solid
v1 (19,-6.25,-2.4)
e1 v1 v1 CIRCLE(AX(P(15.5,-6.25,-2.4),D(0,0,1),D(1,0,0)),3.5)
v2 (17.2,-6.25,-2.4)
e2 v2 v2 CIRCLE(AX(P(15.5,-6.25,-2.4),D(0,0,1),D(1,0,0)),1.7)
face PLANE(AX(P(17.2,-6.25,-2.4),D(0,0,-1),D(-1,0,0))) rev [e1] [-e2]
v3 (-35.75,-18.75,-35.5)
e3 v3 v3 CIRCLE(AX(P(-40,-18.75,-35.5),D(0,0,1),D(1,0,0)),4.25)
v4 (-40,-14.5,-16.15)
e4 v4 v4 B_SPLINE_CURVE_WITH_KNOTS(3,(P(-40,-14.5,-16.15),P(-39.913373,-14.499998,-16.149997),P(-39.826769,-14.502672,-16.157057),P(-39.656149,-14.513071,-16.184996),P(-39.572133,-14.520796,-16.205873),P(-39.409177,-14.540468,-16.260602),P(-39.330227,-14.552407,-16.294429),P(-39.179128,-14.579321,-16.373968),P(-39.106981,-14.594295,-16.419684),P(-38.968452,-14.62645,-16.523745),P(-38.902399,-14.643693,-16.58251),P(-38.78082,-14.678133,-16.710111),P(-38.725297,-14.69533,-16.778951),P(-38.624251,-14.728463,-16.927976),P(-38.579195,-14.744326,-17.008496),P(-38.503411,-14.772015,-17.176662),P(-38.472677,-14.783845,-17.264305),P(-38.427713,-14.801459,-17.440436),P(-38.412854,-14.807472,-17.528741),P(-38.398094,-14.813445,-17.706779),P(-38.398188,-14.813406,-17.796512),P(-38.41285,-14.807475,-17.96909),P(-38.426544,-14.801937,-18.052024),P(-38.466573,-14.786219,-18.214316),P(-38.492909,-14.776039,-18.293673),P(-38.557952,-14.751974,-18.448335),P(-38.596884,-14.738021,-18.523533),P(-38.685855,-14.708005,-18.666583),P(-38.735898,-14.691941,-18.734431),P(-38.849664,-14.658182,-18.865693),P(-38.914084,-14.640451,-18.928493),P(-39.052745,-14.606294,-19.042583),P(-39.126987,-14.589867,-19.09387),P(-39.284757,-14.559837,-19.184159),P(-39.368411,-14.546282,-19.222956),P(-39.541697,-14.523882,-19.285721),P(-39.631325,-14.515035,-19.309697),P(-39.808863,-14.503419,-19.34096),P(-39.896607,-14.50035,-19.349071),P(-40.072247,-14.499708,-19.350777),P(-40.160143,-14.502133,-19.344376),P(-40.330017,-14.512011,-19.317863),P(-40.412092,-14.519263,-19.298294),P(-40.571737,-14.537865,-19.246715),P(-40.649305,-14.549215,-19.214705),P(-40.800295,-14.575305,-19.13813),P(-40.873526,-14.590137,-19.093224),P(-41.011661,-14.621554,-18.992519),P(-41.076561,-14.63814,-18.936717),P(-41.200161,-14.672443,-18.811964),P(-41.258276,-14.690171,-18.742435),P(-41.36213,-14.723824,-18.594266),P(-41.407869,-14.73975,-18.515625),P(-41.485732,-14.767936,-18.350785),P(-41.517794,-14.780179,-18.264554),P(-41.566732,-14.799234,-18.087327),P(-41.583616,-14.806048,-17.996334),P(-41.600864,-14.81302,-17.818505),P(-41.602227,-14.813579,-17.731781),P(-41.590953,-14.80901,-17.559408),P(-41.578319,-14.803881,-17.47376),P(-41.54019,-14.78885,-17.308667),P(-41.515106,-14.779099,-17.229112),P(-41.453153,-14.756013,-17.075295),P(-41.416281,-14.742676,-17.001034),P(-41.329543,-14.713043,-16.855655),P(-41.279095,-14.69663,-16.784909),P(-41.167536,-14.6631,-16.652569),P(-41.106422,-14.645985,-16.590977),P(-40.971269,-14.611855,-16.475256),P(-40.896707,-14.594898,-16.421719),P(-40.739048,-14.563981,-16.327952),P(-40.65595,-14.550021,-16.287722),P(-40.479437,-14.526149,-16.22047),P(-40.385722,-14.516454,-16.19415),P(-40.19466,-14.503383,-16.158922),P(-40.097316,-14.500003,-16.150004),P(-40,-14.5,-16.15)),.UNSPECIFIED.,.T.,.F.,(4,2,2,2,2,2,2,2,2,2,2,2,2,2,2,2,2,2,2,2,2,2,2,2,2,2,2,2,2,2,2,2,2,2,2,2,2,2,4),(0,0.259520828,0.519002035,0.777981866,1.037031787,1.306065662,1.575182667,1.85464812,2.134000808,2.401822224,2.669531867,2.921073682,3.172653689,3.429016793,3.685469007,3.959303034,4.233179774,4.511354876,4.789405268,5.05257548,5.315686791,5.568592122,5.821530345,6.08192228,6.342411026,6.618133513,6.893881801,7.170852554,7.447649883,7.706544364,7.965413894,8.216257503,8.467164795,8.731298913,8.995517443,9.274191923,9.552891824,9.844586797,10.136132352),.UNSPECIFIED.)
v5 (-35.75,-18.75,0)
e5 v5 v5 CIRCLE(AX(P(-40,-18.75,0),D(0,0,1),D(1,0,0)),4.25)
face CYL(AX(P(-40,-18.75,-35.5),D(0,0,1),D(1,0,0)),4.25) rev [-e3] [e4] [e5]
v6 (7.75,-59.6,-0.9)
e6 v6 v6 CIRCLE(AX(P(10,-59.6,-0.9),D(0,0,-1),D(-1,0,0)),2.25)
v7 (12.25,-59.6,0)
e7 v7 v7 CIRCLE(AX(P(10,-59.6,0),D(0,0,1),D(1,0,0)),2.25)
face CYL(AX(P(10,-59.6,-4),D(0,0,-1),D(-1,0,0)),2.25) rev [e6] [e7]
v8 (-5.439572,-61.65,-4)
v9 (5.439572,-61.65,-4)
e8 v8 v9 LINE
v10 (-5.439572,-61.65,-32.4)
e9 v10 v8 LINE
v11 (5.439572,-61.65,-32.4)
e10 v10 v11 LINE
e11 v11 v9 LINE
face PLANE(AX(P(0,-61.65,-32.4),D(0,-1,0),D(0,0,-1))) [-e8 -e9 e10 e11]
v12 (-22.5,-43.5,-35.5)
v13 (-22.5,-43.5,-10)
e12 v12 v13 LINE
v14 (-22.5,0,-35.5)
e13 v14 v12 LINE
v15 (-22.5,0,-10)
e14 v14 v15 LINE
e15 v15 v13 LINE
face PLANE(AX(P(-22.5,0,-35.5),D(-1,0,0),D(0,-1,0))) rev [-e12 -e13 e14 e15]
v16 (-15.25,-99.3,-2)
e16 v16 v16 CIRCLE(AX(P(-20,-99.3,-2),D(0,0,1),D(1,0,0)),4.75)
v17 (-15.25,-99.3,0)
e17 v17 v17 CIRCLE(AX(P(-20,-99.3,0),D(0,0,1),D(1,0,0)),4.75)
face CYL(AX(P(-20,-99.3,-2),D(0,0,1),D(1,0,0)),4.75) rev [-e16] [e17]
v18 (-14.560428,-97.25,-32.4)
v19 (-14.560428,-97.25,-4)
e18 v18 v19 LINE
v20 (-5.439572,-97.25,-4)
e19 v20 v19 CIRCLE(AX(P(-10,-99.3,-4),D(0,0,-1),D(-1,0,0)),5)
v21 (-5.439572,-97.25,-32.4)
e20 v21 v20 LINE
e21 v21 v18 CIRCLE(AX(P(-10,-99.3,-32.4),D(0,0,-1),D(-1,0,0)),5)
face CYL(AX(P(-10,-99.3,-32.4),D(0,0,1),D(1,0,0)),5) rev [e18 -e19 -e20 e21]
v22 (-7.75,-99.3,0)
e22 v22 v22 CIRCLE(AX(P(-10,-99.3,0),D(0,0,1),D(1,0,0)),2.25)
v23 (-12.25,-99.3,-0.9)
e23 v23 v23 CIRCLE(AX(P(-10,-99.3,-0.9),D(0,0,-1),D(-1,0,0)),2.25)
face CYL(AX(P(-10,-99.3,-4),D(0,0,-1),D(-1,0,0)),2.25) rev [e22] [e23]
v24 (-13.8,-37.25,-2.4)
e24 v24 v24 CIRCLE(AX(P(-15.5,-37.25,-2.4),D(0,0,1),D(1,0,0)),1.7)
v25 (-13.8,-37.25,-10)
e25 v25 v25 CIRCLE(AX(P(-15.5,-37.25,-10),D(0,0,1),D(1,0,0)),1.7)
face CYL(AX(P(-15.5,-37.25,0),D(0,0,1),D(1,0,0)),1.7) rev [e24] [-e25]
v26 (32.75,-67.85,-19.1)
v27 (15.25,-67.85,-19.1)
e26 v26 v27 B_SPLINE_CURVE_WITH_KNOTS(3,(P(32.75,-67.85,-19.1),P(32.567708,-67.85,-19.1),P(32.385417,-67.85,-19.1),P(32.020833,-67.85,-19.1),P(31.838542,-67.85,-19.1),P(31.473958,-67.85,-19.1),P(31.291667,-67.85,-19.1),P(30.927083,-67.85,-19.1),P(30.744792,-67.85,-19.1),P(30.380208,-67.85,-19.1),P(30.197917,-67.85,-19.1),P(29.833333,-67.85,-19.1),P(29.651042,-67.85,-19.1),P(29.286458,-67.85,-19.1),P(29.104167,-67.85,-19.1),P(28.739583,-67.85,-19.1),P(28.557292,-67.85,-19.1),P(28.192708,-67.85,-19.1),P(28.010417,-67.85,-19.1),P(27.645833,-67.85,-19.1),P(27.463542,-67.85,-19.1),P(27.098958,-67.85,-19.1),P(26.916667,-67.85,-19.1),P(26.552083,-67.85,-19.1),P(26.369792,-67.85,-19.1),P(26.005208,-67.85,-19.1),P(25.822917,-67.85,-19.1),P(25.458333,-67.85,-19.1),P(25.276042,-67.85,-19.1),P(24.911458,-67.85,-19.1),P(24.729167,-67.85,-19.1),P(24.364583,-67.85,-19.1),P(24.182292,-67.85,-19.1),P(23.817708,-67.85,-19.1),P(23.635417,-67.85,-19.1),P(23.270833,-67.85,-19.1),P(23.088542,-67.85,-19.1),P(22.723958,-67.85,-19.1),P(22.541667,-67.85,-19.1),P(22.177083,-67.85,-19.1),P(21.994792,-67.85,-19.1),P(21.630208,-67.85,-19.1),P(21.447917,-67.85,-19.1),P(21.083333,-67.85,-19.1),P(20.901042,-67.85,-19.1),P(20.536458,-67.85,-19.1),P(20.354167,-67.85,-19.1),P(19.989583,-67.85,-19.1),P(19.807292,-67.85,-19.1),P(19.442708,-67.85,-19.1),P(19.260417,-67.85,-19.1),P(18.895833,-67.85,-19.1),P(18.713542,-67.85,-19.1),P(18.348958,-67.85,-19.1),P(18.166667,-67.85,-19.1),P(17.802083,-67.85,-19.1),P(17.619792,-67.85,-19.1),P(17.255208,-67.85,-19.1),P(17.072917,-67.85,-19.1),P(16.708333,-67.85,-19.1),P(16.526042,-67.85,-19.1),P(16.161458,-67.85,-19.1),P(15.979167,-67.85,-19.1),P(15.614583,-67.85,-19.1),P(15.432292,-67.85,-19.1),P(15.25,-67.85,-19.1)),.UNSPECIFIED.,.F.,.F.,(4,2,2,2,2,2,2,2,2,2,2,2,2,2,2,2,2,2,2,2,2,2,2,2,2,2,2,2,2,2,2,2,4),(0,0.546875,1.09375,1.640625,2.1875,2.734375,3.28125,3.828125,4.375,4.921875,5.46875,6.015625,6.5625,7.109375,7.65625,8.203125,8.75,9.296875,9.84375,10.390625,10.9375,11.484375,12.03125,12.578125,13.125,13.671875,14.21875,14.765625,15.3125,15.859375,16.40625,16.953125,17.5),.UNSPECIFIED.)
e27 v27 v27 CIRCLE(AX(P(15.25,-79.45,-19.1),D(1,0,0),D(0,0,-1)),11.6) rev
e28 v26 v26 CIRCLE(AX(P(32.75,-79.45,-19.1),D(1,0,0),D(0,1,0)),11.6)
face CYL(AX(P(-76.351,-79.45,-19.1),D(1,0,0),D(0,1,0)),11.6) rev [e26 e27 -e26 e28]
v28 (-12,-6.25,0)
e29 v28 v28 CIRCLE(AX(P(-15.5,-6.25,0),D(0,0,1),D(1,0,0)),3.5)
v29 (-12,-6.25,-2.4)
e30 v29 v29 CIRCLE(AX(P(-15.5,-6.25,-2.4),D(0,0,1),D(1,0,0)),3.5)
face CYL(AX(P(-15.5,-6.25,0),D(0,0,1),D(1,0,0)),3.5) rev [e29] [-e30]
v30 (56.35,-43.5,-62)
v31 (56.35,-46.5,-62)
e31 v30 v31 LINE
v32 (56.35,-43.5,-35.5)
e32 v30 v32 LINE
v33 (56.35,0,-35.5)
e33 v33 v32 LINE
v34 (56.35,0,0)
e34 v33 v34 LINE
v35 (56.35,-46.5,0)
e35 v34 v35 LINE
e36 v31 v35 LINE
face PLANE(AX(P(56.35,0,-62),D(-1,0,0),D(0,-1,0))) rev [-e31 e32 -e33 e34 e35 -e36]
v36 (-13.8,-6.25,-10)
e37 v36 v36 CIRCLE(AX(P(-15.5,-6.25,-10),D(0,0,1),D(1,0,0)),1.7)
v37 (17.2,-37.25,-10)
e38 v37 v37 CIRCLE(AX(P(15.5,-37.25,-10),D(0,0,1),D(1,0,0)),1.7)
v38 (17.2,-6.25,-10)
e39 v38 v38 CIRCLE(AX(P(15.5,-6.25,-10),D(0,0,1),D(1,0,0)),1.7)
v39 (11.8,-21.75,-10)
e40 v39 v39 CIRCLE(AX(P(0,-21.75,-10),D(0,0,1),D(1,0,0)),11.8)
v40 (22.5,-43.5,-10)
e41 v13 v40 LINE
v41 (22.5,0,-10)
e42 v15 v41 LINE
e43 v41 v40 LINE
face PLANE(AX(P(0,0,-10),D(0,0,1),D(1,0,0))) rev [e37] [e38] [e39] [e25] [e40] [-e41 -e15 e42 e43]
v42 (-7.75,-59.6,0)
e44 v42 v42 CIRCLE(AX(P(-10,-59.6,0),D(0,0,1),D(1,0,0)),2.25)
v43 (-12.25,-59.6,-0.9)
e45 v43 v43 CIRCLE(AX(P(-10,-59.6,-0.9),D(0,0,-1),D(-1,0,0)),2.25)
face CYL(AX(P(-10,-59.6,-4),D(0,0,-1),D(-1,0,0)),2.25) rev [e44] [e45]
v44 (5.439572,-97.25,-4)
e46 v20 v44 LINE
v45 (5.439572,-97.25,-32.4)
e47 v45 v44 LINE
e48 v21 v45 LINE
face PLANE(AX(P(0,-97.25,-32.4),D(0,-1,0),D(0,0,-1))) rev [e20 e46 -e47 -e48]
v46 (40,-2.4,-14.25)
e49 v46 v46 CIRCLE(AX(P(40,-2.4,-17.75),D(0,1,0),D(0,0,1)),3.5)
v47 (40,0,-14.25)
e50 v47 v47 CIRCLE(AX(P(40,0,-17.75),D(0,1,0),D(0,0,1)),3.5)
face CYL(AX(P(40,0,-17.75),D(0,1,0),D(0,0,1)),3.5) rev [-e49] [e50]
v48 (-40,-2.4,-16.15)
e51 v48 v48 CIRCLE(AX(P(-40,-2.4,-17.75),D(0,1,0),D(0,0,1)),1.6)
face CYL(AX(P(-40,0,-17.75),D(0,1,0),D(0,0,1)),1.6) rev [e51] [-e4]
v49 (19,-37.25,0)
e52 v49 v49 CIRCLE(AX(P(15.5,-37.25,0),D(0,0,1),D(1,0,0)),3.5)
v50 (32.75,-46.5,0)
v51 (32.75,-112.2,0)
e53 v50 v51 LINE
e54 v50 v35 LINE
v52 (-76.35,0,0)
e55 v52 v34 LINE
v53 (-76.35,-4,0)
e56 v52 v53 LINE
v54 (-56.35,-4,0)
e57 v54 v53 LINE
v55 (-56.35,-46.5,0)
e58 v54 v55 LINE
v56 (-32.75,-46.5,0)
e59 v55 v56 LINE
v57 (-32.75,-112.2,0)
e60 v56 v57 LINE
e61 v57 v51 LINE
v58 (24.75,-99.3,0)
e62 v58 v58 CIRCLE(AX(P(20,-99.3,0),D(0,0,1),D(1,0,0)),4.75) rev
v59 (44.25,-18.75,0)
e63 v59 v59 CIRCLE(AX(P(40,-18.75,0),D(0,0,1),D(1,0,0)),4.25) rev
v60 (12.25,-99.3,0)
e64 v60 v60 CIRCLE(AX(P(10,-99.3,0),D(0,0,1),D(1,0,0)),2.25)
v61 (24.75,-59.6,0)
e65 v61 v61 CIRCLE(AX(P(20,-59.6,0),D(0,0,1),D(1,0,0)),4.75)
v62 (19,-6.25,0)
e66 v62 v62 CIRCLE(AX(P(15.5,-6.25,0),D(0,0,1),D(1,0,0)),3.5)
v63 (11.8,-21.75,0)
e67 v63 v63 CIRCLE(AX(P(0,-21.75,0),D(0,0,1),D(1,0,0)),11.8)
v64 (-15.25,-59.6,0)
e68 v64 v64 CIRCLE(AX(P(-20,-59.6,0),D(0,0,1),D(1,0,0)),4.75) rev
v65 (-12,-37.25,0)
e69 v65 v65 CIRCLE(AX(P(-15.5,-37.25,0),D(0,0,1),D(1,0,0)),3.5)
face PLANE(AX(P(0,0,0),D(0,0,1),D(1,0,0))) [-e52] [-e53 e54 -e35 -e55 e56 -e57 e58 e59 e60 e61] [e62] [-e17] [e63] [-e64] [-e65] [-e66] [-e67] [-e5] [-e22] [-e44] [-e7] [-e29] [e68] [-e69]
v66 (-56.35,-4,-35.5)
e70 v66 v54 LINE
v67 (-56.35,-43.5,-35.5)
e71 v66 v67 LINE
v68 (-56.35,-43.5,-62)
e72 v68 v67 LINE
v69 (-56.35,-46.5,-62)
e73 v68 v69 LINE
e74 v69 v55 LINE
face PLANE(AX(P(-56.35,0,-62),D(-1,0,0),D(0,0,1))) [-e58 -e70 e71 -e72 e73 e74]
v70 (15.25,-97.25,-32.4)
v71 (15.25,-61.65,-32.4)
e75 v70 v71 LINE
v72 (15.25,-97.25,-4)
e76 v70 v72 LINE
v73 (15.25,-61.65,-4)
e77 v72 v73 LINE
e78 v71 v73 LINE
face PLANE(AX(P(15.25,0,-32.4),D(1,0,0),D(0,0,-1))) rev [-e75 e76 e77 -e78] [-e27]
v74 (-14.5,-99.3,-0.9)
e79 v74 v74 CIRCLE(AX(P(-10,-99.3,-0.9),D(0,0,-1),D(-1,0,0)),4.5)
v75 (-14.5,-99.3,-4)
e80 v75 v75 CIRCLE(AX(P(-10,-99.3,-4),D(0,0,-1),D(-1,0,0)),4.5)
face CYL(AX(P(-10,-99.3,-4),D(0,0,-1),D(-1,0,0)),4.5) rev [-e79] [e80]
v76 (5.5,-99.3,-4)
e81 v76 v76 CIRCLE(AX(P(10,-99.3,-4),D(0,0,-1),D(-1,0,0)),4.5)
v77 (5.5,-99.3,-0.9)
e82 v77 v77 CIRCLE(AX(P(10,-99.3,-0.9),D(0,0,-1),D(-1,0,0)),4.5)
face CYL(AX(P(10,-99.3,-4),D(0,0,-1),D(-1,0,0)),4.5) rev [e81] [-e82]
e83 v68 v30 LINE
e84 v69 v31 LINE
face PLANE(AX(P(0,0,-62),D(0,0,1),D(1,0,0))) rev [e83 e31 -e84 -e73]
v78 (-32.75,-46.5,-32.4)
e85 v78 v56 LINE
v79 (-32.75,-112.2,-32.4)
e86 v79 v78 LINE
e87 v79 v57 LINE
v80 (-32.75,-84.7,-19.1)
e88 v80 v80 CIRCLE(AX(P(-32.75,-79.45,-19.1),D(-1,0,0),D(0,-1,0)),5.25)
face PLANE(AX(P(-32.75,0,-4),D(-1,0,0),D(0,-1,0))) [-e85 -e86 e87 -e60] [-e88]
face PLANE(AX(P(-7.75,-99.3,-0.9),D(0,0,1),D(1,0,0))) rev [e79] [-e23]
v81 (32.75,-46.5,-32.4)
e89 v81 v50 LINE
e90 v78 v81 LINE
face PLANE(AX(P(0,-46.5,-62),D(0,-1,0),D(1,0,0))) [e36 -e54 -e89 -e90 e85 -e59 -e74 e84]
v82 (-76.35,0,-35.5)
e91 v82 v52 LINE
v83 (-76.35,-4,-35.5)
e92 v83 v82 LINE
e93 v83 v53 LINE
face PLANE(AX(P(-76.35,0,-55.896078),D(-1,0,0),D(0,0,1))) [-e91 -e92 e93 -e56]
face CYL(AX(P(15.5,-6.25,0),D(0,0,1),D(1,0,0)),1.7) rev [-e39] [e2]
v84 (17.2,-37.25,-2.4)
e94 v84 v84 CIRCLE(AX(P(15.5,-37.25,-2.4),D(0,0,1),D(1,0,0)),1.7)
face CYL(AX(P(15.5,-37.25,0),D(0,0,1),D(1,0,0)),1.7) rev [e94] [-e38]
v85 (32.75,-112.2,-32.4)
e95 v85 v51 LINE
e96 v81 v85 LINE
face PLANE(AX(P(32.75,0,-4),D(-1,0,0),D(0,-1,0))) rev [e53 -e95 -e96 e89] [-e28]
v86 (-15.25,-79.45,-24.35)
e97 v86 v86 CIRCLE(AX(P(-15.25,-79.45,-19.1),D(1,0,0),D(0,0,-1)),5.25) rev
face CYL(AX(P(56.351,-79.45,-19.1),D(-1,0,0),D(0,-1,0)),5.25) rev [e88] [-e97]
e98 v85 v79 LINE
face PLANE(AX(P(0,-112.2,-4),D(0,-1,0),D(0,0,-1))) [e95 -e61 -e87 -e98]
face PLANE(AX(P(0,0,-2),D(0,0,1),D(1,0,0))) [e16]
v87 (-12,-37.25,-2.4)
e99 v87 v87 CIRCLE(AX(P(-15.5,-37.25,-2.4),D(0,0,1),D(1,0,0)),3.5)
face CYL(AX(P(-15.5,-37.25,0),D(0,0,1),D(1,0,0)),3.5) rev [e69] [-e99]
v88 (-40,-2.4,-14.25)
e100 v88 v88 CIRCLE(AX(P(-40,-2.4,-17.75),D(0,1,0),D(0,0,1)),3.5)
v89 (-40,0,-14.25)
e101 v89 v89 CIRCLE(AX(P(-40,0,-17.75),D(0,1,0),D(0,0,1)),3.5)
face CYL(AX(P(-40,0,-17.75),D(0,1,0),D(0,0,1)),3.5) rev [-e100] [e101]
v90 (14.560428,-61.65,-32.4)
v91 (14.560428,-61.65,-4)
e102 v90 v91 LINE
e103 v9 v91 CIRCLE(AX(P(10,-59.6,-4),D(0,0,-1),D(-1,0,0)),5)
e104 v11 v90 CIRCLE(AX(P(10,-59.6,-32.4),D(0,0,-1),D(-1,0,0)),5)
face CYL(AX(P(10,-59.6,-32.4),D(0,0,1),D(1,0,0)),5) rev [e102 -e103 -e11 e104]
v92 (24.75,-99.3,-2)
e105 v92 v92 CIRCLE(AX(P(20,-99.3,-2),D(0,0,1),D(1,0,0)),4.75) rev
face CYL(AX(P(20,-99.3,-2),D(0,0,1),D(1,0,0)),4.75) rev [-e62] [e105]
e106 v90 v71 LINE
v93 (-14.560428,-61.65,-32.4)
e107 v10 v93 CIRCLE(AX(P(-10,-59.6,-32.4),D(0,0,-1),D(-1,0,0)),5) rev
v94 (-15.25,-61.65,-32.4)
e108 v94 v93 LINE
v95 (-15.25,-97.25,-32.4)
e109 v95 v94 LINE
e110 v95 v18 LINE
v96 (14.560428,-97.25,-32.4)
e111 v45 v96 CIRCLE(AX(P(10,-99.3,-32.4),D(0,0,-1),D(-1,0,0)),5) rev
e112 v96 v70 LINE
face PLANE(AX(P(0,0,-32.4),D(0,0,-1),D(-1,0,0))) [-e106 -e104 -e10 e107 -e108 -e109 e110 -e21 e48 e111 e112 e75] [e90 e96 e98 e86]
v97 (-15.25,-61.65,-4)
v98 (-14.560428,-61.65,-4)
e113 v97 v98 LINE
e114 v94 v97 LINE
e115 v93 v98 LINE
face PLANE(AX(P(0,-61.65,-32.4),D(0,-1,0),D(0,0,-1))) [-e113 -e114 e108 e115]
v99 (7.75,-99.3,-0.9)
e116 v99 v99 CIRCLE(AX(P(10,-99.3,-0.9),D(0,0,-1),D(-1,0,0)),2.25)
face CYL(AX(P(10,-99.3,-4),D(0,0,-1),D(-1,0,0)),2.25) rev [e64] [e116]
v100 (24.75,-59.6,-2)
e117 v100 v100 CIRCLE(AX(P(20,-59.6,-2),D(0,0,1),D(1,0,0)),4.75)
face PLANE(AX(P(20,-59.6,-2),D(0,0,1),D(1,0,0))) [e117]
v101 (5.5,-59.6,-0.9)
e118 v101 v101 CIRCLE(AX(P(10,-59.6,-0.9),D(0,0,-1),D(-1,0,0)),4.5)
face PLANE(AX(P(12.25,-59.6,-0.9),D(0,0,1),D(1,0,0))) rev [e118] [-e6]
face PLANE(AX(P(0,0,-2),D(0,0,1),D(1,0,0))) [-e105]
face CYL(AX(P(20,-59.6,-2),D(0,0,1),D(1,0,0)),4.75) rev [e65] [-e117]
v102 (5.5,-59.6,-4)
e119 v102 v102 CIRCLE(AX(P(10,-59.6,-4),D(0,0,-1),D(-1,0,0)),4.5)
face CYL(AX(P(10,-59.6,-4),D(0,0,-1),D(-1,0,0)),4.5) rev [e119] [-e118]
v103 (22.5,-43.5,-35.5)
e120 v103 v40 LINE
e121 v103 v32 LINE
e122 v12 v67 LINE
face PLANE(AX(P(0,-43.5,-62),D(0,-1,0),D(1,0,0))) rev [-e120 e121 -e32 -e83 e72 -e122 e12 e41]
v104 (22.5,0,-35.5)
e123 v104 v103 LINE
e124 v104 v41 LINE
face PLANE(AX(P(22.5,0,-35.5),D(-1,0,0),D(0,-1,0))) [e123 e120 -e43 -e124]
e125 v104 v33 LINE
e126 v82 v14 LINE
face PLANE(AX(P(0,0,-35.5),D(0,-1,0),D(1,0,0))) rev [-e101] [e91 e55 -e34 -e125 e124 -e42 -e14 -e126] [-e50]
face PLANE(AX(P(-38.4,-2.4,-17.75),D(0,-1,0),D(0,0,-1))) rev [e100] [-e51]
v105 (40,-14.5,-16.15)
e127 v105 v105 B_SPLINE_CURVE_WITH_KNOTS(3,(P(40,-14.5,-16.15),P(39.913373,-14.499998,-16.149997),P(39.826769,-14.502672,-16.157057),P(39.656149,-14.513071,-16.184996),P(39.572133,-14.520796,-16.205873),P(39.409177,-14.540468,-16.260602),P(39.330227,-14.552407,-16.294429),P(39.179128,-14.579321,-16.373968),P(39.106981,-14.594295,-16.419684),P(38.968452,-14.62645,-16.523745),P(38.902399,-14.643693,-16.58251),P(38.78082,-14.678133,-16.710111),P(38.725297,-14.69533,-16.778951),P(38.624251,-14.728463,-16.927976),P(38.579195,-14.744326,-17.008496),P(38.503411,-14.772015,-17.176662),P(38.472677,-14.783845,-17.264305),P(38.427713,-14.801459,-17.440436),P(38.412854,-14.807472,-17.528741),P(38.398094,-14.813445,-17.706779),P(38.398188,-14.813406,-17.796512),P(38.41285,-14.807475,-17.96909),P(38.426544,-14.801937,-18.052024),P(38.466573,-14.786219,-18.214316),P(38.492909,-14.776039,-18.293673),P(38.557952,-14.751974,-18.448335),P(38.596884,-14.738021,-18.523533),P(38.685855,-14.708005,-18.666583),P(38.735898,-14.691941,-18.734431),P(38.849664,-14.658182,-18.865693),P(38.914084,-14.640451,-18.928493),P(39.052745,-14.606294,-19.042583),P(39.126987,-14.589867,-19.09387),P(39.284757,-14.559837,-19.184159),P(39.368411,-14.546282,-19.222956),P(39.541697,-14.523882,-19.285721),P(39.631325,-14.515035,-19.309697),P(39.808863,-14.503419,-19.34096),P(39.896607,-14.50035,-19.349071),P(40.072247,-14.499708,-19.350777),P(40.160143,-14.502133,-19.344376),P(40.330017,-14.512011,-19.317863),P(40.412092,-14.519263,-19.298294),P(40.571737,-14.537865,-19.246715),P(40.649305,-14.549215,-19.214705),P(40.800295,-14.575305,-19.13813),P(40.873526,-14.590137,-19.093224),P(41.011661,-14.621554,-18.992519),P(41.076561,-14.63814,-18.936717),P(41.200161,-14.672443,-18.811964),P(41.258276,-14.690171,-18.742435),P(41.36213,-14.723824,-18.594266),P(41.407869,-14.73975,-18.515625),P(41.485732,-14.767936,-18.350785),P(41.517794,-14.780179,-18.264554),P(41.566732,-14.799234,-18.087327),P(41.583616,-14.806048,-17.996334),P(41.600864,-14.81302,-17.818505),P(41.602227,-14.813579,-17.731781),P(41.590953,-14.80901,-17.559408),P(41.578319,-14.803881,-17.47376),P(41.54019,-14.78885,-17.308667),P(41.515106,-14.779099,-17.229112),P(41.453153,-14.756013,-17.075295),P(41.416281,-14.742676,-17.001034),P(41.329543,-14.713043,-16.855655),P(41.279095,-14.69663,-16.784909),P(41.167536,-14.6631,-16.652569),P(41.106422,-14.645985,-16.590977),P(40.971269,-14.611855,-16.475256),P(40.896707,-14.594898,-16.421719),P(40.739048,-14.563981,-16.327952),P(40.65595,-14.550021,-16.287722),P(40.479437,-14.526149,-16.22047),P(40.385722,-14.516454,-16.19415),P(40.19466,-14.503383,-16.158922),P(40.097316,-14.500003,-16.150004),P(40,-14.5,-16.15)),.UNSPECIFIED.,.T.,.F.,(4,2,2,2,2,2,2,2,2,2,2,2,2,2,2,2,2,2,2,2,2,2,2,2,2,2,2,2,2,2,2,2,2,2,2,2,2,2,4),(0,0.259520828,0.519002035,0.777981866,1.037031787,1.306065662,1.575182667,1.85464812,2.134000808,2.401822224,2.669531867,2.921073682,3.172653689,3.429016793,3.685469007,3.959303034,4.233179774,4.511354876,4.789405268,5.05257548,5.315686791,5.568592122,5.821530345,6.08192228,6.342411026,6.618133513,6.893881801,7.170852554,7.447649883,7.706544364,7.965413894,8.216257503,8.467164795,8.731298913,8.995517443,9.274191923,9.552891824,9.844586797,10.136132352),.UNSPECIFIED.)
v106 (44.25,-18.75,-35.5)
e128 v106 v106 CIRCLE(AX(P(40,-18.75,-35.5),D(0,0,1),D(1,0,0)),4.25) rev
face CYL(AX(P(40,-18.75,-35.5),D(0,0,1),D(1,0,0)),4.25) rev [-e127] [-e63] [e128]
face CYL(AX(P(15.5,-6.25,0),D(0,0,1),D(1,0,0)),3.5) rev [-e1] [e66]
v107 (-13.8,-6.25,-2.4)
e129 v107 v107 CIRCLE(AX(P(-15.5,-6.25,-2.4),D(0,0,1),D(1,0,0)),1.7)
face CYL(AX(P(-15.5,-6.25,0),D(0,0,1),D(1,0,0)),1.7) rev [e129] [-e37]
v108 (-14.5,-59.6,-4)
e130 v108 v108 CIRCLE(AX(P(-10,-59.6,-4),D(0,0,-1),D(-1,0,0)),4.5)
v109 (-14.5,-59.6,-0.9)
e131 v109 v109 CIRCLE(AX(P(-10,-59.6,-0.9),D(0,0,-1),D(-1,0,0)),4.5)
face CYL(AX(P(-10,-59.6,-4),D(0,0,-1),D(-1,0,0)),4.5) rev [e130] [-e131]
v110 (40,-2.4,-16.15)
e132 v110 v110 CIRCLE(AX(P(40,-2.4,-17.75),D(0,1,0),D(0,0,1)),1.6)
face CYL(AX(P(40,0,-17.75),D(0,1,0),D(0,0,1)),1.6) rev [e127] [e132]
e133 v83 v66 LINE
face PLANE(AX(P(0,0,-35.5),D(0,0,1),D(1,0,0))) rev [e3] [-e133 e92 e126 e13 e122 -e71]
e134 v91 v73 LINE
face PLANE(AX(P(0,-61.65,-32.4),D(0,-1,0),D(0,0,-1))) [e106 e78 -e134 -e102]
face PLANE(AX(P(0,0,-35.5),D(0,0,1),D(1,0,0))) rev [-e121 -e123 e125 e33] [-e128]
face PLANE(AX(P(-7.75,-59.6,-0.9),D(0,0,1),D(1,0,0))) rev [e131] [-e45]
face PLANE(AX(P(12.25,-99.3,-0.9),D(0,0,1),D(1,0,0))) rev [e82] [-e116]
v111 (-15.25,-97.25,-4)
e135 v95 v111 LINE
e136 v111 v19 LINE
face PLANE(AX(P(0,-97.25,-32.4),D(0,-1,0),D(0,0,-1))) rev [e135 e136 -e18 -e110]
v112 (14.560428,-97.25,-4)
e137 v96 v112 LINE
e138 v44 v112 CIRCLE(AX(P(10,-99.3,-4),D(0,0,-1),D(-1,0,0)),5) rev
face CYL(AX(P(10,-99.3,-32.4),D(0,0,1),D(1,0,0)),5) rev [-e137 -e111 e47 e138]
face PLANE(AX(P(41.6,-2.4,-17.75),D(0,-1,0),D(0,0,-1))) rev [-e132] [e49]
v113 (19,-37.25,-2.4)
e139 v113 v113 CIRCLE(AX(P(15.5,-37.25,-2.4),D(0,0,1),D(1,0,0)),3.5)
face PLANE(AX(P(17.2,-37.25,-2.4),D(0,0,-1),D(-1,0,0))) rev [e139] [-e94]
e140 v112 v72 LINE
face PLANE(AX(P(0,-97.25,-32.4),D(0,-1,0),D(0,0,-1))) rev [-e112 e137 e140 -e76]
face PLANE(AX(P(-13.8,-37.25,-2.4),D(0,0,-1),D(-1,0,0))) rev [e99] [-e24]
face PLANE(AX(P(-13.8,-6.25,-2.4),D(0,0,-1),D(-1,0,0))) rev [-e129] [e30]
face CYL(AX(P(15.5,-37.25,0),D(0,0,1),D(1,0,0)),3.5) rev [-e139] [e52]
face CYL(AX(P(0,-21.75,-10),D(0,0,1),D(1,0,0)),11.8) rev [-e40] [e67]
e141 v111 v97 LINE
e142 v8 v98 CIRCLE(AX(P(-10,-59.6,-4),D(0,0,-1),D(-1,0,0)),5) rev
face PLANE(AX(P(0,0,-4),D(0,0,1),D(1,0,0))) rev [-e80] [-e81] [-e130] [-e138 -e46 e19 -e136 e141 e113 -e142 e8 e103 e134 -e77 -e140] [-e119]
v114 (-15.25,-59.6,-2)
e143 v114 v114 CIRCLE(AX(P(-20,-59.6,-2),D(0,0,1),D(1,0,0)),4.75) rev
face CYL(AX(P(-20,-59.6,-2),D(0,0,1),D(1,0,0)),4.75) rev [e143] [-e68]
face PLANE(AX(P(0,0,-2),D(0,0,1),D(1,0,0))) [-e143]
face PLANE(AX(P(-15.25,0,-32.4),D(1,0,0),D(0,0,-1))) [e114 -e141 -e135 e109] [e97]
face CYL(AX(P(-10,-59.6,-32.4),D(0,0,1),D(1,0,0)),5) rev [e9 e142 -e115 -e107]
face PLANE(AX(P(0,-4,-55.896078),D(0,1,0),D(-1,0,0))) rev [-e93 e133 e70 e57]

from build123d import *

# Parameters (mm, degrees)
SKETCH8_W                                        = 65.5
SKETCH8_H                                        = 65.7
BOSS_EXTRUDE6_DEPTH                              = 4
SKETCH8_3_R                                      = 4.25
BOSS_EXTRUDE7_DEPTH                              = 35.5
SKETCH8_3_W                                      = 33.85
SKETCH8_3_H                                      = 43.5
BOSS_EXTRUDE7_2_DEPTH                            = 35.5
SKETCH8_4_W                                      = 45
SKETCH8_4_H                                      = 43.5
SKETCH8_4_R                                      = 11.8
BOSS_EXTRUDE8_DEPTH                              = 10
BOSS_EXTRUDE9_DEPTH                              = 62
SKETCH8_6_W                                      = 20
SKETCH8_6_H                                      = 4
BOSS_EXTRUDE10_DEPTH                             = 35.5
CBORE_FOR_M3_PAN_HEAD_MACHINE_SCREW2_D           = 3.4
CBORE_FOR_M3_PAN_HEAD_MACHINE_SCREW2_CBORE_D     = 7
CBORE_FOR_M3_PAN_HEAD_MACHINE_SCREW2_CBORE_DEPTH = 2.4
SKETCH13_R                                       = 4.75
CUT_EXTRUDE1_DEPTH                               = 2
CBORE_FOR_M4_PAN_HEAD_MACHINE_SCREW1_D           = 4.5
CBORE_FOR_M4_PAN_HEAD_MACHINE_SCREW1_CBORE_D     = 9
CBORE_FOR_M4_PAN_HEAD_MACHINE_SCREW1_CBORE_DEPTH = 3.1
SKETCH14_W                                       = 65.5
SKETCH14_H                                       = 65.7
BOSS_EXTRUDE11_DEPTH                             = 28.4
CUT_EXTRUDE2_REACH                               = 170.332
SKETCH17_R                                       = 11.6
CUT_EXTRUDE3_REACH                               = 158.114
SKETCH19_R                                       = 5.25
CBORE_START                                      = -14.812673424
CBORE_FOR_M3_PAN_HEAD_MACHINE_SCREW3_OUT_R       = 1.6
CBORE_FOR_M3_PAN_HEAD_MACHINE_SCREW3_DEPTH       = 14.812673424
CBORE_START_2                                    = -2.4
CBORE_FOR_M3_PAN_HEAD_MACHINE_SCREW3_2_O_R       = 3.5
CBORE_FOR_M3_PAN_HEAD_MACHINE_SCREW3_2_O_R_2     = 1.6
CBORE_FOR_M3_PAN_HEAD_MACHINE_SCREW3_2_DEPTH     = 2.4


# Read off the part's stored shape, not the designer's step: CBORE for M3 Pan Head Machine Screw3
with BuildPart() as part:
    # Sketch8 → Boss-Extrude6 (new body)
    with BuildSketch(Plane.XY):
        with Locations((0, -79.35)):
            Rectangle(SKETCH8_W, SKETCH8_H)
    extrude(amount=-BOSS_EXTRUDE6_DEPTH)



with BuildPart() as body_2:
    # Sketch8<3> → Boss-Extrude7 (new body)
    with BuildSketch(Plane.XY):
        Polygon((-22.5, 0), (-56.35, 0), (-56.35, -4), (-56.35, -43.5), (-22.5, -43.5), align=None)
        with Locations((-40, -18.75)):
            Circle(SKETCH8_3_R, mode=Mode.SUBTRACT)
    extrude(amount=-BOSS_EXTRUDE7_DEPTH)



with BuildPart() as body_3:
    # Sketch8<3> → Boss-Extrude7 2 (new body)
    with BuildSketch(Plane.XY):
        with Locations((39.425, -21.75)):
            Rectangle(SKETCH8_3_W, SKETCH8_3_H)
        with Locations((40, -18.75)):
            Circle(SKETCH8_3_R, mode=Mode.SUBTRACT)
    extrude(amount=-BOSS_EXTRUDE7_2_DEPTH)


with BuildPart() as body_2_1:
    add(body_2.part)

    add(body_3.part)  # Boss-Extrude8 merges body 3
    # Sketch8<4> → Boss-Extrude8 (add)
    with BuildSketch(Plane.XY):
        with Locations((0, -21.75)):
            Rectangle(SKETCH8_4_W, SKETCH8_4_H)
        with Locations((0, -21.75)):
            Circle(SKETCH8_4_R, mode=Mode.SUBTRACT)
    extrude(amount=-BOSS_EXTRUDE8_DEPTH)


with BuildPart() as part_1:
    add(part.part)

    add(body_2_1.part)  # Boss-Extrude9 merges body 2
    # Sketch8<5> → Boss-Extrude9 (add)
    with BuildSketch(Plane.XY):
        Polygon((22.5, -43.5), (-22.5, -43.5), (-56.35, -43.5), (-56.35, -46.5), (-32.75, -46.5), (32.75, -46.5), (56.35, -46.5), (56.35, -43.5), align=None)
    extrude(amount=-BOSS_EXTRUDE9_DEPTH)

    # Sketch8<6> → Boss-Extrude10 (add)
    with BuildSketch(Plane.XY):
        with Locations((-66.35, -2)):
            Rectangle(SKETCH8_6_W, SKETCH8_6_H)
    extrude(amount=-BOSS_EXTRUDE10_DEPTH)

    # CBORE for M3 Pan Head Machine Screw2 (through all)
    with Locations(Plane(origin=(-15.5, -6.25, 0), x_dir=(1, 0, 0), z_dir=(0, 0, 1))):
        with Locations((0, 0), (31, 0), (31, -31), (0, -31)):
            CounterBoreHole(CBORE_FOR_M3_PAN_HEAD_MACHINE_SCREW2_D / 2, CBORE_FOR_M3_PAN_HEAD_MACHINE_SCREW2_CBORE_D / 2, CBORE_FOR_M3_PAN_HEAD_MACHINE_SCREW2_CBORE_DEPTH)

    # Sketch13 → Cut-Extrude1 (cut)
    with BuildSketch(Plane.XY):
        with Locations((-20, -59.6)):
            Circle(SKETCH13_R)
        with Locations((20, -99.3)):
            Circle(SKETCH13_R)
        with Locations((-20, -99.3)):
            Circle(SKETCH13_R)
        with Locations((20, -59.6)):
            Circle(SKETCH13_R)
    extrude(amount=-CUT_EXTRUDE1_DEPTH, mode=Mode.SUBTRACT)

    # CBORE for M4 Pan Head Machine Screw1 (through all)
    with Locations(Plane(origin=(10, -59.6, -4), x_dir=(-1, 0, 0), z_dir=(0, 0, -1))):
        with Locations((0, 0), (20, 0), (0, -39.7), (20, -39.7)):
            CounterBoreHole(CBORE_FOR_M4_PAN_HEAD_MACHINE_SCREW1_D / 2, CBORE_FOR_M4_PAN_HEAD_MACHINE_SCREW1_CBORE_D / 2, CBORE_FOR_M4_PAN_HEAD_MACHINE_SCREW1_CBORE_DEPTH)

    # Sketch14 → Boss-Extrude11 (add)
    with BuildSketch(Plane(origin=(0, 0, -4), x_dir=(-1, 0, 0), z_dir=(0, 0, -1))):
        with Locations((0, -79.35)):
            Rectangle(SKETCH14_W, SKETCH14_H)
        with BuildLine():
            Line((15.25, -61.65), (15.25, -97.25))
            Line((15.25, -97.25), (14.560427612, -97.25))
            ThreePointArc((14.560427612, -97.25), (14.888871959, -98.251700915), (15, -99.3))
            ThreePointArc((15, -99.3), (8.951700915, -104.188871959), (5.439572388, -97.25))
            Line((5.439572388, -97.25), (-5.439572388, -97.25))
            ThreePointArc((-5.439572388, -97.25), (-5.111128041, -98.251700915), (-5, -99.3))
            ThreePointArc((-5, -99.3), (-11.048299085, -104.188871959), (-14.560427612, -97.25))
            Line((-14.560427612, -97.25), (-15.25, -97.25))
            Line((-15.25, -97.25), (-15.25, -61.65))
            Line((-15.25, -61.65), (-14.560427612, -61.65))
            ThreePointArc((-14.560427612, -61.65), (-11.048299085, -54.711128041), (-5, -59.6))
            ThreePointArc((-5, -59.6), (-5.111128041, -60.648299085), (-5.439572388, -61.65))
            Line((-5.439572388, -61.65), (5.439572388, -61.65))
            ThreePointArc((5.439572388, -61.65), (8.951700915, -54.711128041), (15, -59.6))
            ThreePointArc((15, -59.6), (14.888871959, -60.648299085), (14.560427612, -61.65))
            Line((14.560427612, -61.65), (15.25, -61.65))
        make_face(mode=Mode.SUBTRACT)
    extrude(amount=BOSS_EXTRUDE11_DEPTH)

    # Sketch17 → Cut-Extrude2 (cut, up to next)
    with BuildSketch(Plane(origin=(32.75, 0, 0), x_dir=(0, 0, -1), z_dir=(1, 0, 0)), mode=Mode.PRIVATE) as cut_extrude2_sk1:
        with Locations(Location((19.1, -79.45, 0), (0, 0, 90))):
            Circle(SKETCH17_R)
    cut_extrude2_tool1 = extrude(cut_extrude2_sk1.sketch, amount=-CUT_EXTRUDE2_REACH, mode=Mode.PRIVATE) & part_1.part
    add(cut_extrude2_tool1.solids().sort_by_distance((32.75, -79.45, -19.1))[0], mode=Mode.SUBTRACT)

    # Sketch19 → Cut-Extrude3 (cut, up to next)
    with BuildSketch(Plane.ZY.offset(32.75), mode=Mode.PRIVATE) as cut_extrude3_sk1:
        with Locations(Location((-19.1, -79.45, 0), (0, 0, 270))):
            Circle(SKETCH19_R)
    cut_extrude3_tool1 = extrude(cut_extrude3_sk1.sketch, amount=-CUT_EXTRUDE3_REACH, mode=Mode.PRIVATE) & part_1.part
    add(cut_extrude3_tool1.solids().sort_by_distance((-32.75, -79.45, -19.1))[0], mode=Mode.SUBTRACT)

    # CBORE for M3 Pan Head Machine Screw3 out → CBORE for M3 Pan Head Machine Screw3 (cut)
    with BuildSketch(Plane(origin=(0, 0, 0), x_dir=(1, 0, 0), z_dir=(0, 1, 0)).offset(CBORE_START)):
        with Locations((-40, 17.75)):
            Circle(CBORE_FOR_M3_PAN_HEAD_MACHINE_SCREW3_OUT_R)
        with Locations((40, 17.75)):
            Circle(CBORE_FOR_M3_PAN_HEAD_MACHINE_SCREW3_OUT_R)
    extrude(amount=CBORE_FOR_M3_PAN_HEAD_MACHINE_SCREW3_DEPTH, mode=Mode.SUBTRACT)

    # CBORE for M3 Pan Head Machine Screw3 2 o → CBORE for M3 Pan Head Machine Screw3 2 (cut)
    # profile 1 of 2: a face of its own
    with BuildSketch(Plane(origin=(0, 0, 0), x_dir=(1, 0, 0), z_dir=(0, 1, 0)).offset(CBORE_START_2)):
        with Locations((-40, 17.75)):
            Circle(CBORE_FOR_M3_PAN_HEAD_MACHINE_SCREW3_2_O_R)
        with Locations((-40, 17.75)):
            Circle(CBORE_FOR_M3_PAN_HEAD_MACHINE_SCREW3_2_O_R_2, mode=Mode.SUBTRACT)
    # profile 2 of 2: a face of its own
    with BuildSketch(Plane(origin=(0, 0, 0), x_dir=(1, 0, 0), z_dir=(0, 1, 0)).offset(CBORE_START_2)):
        with Locations((40, 17.75)):
            Circle(CBORE_FOR_M3_PAN_HEAD_MACHINE_SCREW3_2_O_R)
        with Locations((40, 17.75)):
            Circle(CBORE_FOR_M3_PAN_HEAD_MACHINE_SCREW3_2_O_R_2, mode=Mode.SUBTRACT)
    extrude(amount=CBORE_FOR_M3_PAN_HEAD_MACHINE_SCREW3_2_DEPTH, mode=Mode.SUBTRACT)


solid = part_1.part
